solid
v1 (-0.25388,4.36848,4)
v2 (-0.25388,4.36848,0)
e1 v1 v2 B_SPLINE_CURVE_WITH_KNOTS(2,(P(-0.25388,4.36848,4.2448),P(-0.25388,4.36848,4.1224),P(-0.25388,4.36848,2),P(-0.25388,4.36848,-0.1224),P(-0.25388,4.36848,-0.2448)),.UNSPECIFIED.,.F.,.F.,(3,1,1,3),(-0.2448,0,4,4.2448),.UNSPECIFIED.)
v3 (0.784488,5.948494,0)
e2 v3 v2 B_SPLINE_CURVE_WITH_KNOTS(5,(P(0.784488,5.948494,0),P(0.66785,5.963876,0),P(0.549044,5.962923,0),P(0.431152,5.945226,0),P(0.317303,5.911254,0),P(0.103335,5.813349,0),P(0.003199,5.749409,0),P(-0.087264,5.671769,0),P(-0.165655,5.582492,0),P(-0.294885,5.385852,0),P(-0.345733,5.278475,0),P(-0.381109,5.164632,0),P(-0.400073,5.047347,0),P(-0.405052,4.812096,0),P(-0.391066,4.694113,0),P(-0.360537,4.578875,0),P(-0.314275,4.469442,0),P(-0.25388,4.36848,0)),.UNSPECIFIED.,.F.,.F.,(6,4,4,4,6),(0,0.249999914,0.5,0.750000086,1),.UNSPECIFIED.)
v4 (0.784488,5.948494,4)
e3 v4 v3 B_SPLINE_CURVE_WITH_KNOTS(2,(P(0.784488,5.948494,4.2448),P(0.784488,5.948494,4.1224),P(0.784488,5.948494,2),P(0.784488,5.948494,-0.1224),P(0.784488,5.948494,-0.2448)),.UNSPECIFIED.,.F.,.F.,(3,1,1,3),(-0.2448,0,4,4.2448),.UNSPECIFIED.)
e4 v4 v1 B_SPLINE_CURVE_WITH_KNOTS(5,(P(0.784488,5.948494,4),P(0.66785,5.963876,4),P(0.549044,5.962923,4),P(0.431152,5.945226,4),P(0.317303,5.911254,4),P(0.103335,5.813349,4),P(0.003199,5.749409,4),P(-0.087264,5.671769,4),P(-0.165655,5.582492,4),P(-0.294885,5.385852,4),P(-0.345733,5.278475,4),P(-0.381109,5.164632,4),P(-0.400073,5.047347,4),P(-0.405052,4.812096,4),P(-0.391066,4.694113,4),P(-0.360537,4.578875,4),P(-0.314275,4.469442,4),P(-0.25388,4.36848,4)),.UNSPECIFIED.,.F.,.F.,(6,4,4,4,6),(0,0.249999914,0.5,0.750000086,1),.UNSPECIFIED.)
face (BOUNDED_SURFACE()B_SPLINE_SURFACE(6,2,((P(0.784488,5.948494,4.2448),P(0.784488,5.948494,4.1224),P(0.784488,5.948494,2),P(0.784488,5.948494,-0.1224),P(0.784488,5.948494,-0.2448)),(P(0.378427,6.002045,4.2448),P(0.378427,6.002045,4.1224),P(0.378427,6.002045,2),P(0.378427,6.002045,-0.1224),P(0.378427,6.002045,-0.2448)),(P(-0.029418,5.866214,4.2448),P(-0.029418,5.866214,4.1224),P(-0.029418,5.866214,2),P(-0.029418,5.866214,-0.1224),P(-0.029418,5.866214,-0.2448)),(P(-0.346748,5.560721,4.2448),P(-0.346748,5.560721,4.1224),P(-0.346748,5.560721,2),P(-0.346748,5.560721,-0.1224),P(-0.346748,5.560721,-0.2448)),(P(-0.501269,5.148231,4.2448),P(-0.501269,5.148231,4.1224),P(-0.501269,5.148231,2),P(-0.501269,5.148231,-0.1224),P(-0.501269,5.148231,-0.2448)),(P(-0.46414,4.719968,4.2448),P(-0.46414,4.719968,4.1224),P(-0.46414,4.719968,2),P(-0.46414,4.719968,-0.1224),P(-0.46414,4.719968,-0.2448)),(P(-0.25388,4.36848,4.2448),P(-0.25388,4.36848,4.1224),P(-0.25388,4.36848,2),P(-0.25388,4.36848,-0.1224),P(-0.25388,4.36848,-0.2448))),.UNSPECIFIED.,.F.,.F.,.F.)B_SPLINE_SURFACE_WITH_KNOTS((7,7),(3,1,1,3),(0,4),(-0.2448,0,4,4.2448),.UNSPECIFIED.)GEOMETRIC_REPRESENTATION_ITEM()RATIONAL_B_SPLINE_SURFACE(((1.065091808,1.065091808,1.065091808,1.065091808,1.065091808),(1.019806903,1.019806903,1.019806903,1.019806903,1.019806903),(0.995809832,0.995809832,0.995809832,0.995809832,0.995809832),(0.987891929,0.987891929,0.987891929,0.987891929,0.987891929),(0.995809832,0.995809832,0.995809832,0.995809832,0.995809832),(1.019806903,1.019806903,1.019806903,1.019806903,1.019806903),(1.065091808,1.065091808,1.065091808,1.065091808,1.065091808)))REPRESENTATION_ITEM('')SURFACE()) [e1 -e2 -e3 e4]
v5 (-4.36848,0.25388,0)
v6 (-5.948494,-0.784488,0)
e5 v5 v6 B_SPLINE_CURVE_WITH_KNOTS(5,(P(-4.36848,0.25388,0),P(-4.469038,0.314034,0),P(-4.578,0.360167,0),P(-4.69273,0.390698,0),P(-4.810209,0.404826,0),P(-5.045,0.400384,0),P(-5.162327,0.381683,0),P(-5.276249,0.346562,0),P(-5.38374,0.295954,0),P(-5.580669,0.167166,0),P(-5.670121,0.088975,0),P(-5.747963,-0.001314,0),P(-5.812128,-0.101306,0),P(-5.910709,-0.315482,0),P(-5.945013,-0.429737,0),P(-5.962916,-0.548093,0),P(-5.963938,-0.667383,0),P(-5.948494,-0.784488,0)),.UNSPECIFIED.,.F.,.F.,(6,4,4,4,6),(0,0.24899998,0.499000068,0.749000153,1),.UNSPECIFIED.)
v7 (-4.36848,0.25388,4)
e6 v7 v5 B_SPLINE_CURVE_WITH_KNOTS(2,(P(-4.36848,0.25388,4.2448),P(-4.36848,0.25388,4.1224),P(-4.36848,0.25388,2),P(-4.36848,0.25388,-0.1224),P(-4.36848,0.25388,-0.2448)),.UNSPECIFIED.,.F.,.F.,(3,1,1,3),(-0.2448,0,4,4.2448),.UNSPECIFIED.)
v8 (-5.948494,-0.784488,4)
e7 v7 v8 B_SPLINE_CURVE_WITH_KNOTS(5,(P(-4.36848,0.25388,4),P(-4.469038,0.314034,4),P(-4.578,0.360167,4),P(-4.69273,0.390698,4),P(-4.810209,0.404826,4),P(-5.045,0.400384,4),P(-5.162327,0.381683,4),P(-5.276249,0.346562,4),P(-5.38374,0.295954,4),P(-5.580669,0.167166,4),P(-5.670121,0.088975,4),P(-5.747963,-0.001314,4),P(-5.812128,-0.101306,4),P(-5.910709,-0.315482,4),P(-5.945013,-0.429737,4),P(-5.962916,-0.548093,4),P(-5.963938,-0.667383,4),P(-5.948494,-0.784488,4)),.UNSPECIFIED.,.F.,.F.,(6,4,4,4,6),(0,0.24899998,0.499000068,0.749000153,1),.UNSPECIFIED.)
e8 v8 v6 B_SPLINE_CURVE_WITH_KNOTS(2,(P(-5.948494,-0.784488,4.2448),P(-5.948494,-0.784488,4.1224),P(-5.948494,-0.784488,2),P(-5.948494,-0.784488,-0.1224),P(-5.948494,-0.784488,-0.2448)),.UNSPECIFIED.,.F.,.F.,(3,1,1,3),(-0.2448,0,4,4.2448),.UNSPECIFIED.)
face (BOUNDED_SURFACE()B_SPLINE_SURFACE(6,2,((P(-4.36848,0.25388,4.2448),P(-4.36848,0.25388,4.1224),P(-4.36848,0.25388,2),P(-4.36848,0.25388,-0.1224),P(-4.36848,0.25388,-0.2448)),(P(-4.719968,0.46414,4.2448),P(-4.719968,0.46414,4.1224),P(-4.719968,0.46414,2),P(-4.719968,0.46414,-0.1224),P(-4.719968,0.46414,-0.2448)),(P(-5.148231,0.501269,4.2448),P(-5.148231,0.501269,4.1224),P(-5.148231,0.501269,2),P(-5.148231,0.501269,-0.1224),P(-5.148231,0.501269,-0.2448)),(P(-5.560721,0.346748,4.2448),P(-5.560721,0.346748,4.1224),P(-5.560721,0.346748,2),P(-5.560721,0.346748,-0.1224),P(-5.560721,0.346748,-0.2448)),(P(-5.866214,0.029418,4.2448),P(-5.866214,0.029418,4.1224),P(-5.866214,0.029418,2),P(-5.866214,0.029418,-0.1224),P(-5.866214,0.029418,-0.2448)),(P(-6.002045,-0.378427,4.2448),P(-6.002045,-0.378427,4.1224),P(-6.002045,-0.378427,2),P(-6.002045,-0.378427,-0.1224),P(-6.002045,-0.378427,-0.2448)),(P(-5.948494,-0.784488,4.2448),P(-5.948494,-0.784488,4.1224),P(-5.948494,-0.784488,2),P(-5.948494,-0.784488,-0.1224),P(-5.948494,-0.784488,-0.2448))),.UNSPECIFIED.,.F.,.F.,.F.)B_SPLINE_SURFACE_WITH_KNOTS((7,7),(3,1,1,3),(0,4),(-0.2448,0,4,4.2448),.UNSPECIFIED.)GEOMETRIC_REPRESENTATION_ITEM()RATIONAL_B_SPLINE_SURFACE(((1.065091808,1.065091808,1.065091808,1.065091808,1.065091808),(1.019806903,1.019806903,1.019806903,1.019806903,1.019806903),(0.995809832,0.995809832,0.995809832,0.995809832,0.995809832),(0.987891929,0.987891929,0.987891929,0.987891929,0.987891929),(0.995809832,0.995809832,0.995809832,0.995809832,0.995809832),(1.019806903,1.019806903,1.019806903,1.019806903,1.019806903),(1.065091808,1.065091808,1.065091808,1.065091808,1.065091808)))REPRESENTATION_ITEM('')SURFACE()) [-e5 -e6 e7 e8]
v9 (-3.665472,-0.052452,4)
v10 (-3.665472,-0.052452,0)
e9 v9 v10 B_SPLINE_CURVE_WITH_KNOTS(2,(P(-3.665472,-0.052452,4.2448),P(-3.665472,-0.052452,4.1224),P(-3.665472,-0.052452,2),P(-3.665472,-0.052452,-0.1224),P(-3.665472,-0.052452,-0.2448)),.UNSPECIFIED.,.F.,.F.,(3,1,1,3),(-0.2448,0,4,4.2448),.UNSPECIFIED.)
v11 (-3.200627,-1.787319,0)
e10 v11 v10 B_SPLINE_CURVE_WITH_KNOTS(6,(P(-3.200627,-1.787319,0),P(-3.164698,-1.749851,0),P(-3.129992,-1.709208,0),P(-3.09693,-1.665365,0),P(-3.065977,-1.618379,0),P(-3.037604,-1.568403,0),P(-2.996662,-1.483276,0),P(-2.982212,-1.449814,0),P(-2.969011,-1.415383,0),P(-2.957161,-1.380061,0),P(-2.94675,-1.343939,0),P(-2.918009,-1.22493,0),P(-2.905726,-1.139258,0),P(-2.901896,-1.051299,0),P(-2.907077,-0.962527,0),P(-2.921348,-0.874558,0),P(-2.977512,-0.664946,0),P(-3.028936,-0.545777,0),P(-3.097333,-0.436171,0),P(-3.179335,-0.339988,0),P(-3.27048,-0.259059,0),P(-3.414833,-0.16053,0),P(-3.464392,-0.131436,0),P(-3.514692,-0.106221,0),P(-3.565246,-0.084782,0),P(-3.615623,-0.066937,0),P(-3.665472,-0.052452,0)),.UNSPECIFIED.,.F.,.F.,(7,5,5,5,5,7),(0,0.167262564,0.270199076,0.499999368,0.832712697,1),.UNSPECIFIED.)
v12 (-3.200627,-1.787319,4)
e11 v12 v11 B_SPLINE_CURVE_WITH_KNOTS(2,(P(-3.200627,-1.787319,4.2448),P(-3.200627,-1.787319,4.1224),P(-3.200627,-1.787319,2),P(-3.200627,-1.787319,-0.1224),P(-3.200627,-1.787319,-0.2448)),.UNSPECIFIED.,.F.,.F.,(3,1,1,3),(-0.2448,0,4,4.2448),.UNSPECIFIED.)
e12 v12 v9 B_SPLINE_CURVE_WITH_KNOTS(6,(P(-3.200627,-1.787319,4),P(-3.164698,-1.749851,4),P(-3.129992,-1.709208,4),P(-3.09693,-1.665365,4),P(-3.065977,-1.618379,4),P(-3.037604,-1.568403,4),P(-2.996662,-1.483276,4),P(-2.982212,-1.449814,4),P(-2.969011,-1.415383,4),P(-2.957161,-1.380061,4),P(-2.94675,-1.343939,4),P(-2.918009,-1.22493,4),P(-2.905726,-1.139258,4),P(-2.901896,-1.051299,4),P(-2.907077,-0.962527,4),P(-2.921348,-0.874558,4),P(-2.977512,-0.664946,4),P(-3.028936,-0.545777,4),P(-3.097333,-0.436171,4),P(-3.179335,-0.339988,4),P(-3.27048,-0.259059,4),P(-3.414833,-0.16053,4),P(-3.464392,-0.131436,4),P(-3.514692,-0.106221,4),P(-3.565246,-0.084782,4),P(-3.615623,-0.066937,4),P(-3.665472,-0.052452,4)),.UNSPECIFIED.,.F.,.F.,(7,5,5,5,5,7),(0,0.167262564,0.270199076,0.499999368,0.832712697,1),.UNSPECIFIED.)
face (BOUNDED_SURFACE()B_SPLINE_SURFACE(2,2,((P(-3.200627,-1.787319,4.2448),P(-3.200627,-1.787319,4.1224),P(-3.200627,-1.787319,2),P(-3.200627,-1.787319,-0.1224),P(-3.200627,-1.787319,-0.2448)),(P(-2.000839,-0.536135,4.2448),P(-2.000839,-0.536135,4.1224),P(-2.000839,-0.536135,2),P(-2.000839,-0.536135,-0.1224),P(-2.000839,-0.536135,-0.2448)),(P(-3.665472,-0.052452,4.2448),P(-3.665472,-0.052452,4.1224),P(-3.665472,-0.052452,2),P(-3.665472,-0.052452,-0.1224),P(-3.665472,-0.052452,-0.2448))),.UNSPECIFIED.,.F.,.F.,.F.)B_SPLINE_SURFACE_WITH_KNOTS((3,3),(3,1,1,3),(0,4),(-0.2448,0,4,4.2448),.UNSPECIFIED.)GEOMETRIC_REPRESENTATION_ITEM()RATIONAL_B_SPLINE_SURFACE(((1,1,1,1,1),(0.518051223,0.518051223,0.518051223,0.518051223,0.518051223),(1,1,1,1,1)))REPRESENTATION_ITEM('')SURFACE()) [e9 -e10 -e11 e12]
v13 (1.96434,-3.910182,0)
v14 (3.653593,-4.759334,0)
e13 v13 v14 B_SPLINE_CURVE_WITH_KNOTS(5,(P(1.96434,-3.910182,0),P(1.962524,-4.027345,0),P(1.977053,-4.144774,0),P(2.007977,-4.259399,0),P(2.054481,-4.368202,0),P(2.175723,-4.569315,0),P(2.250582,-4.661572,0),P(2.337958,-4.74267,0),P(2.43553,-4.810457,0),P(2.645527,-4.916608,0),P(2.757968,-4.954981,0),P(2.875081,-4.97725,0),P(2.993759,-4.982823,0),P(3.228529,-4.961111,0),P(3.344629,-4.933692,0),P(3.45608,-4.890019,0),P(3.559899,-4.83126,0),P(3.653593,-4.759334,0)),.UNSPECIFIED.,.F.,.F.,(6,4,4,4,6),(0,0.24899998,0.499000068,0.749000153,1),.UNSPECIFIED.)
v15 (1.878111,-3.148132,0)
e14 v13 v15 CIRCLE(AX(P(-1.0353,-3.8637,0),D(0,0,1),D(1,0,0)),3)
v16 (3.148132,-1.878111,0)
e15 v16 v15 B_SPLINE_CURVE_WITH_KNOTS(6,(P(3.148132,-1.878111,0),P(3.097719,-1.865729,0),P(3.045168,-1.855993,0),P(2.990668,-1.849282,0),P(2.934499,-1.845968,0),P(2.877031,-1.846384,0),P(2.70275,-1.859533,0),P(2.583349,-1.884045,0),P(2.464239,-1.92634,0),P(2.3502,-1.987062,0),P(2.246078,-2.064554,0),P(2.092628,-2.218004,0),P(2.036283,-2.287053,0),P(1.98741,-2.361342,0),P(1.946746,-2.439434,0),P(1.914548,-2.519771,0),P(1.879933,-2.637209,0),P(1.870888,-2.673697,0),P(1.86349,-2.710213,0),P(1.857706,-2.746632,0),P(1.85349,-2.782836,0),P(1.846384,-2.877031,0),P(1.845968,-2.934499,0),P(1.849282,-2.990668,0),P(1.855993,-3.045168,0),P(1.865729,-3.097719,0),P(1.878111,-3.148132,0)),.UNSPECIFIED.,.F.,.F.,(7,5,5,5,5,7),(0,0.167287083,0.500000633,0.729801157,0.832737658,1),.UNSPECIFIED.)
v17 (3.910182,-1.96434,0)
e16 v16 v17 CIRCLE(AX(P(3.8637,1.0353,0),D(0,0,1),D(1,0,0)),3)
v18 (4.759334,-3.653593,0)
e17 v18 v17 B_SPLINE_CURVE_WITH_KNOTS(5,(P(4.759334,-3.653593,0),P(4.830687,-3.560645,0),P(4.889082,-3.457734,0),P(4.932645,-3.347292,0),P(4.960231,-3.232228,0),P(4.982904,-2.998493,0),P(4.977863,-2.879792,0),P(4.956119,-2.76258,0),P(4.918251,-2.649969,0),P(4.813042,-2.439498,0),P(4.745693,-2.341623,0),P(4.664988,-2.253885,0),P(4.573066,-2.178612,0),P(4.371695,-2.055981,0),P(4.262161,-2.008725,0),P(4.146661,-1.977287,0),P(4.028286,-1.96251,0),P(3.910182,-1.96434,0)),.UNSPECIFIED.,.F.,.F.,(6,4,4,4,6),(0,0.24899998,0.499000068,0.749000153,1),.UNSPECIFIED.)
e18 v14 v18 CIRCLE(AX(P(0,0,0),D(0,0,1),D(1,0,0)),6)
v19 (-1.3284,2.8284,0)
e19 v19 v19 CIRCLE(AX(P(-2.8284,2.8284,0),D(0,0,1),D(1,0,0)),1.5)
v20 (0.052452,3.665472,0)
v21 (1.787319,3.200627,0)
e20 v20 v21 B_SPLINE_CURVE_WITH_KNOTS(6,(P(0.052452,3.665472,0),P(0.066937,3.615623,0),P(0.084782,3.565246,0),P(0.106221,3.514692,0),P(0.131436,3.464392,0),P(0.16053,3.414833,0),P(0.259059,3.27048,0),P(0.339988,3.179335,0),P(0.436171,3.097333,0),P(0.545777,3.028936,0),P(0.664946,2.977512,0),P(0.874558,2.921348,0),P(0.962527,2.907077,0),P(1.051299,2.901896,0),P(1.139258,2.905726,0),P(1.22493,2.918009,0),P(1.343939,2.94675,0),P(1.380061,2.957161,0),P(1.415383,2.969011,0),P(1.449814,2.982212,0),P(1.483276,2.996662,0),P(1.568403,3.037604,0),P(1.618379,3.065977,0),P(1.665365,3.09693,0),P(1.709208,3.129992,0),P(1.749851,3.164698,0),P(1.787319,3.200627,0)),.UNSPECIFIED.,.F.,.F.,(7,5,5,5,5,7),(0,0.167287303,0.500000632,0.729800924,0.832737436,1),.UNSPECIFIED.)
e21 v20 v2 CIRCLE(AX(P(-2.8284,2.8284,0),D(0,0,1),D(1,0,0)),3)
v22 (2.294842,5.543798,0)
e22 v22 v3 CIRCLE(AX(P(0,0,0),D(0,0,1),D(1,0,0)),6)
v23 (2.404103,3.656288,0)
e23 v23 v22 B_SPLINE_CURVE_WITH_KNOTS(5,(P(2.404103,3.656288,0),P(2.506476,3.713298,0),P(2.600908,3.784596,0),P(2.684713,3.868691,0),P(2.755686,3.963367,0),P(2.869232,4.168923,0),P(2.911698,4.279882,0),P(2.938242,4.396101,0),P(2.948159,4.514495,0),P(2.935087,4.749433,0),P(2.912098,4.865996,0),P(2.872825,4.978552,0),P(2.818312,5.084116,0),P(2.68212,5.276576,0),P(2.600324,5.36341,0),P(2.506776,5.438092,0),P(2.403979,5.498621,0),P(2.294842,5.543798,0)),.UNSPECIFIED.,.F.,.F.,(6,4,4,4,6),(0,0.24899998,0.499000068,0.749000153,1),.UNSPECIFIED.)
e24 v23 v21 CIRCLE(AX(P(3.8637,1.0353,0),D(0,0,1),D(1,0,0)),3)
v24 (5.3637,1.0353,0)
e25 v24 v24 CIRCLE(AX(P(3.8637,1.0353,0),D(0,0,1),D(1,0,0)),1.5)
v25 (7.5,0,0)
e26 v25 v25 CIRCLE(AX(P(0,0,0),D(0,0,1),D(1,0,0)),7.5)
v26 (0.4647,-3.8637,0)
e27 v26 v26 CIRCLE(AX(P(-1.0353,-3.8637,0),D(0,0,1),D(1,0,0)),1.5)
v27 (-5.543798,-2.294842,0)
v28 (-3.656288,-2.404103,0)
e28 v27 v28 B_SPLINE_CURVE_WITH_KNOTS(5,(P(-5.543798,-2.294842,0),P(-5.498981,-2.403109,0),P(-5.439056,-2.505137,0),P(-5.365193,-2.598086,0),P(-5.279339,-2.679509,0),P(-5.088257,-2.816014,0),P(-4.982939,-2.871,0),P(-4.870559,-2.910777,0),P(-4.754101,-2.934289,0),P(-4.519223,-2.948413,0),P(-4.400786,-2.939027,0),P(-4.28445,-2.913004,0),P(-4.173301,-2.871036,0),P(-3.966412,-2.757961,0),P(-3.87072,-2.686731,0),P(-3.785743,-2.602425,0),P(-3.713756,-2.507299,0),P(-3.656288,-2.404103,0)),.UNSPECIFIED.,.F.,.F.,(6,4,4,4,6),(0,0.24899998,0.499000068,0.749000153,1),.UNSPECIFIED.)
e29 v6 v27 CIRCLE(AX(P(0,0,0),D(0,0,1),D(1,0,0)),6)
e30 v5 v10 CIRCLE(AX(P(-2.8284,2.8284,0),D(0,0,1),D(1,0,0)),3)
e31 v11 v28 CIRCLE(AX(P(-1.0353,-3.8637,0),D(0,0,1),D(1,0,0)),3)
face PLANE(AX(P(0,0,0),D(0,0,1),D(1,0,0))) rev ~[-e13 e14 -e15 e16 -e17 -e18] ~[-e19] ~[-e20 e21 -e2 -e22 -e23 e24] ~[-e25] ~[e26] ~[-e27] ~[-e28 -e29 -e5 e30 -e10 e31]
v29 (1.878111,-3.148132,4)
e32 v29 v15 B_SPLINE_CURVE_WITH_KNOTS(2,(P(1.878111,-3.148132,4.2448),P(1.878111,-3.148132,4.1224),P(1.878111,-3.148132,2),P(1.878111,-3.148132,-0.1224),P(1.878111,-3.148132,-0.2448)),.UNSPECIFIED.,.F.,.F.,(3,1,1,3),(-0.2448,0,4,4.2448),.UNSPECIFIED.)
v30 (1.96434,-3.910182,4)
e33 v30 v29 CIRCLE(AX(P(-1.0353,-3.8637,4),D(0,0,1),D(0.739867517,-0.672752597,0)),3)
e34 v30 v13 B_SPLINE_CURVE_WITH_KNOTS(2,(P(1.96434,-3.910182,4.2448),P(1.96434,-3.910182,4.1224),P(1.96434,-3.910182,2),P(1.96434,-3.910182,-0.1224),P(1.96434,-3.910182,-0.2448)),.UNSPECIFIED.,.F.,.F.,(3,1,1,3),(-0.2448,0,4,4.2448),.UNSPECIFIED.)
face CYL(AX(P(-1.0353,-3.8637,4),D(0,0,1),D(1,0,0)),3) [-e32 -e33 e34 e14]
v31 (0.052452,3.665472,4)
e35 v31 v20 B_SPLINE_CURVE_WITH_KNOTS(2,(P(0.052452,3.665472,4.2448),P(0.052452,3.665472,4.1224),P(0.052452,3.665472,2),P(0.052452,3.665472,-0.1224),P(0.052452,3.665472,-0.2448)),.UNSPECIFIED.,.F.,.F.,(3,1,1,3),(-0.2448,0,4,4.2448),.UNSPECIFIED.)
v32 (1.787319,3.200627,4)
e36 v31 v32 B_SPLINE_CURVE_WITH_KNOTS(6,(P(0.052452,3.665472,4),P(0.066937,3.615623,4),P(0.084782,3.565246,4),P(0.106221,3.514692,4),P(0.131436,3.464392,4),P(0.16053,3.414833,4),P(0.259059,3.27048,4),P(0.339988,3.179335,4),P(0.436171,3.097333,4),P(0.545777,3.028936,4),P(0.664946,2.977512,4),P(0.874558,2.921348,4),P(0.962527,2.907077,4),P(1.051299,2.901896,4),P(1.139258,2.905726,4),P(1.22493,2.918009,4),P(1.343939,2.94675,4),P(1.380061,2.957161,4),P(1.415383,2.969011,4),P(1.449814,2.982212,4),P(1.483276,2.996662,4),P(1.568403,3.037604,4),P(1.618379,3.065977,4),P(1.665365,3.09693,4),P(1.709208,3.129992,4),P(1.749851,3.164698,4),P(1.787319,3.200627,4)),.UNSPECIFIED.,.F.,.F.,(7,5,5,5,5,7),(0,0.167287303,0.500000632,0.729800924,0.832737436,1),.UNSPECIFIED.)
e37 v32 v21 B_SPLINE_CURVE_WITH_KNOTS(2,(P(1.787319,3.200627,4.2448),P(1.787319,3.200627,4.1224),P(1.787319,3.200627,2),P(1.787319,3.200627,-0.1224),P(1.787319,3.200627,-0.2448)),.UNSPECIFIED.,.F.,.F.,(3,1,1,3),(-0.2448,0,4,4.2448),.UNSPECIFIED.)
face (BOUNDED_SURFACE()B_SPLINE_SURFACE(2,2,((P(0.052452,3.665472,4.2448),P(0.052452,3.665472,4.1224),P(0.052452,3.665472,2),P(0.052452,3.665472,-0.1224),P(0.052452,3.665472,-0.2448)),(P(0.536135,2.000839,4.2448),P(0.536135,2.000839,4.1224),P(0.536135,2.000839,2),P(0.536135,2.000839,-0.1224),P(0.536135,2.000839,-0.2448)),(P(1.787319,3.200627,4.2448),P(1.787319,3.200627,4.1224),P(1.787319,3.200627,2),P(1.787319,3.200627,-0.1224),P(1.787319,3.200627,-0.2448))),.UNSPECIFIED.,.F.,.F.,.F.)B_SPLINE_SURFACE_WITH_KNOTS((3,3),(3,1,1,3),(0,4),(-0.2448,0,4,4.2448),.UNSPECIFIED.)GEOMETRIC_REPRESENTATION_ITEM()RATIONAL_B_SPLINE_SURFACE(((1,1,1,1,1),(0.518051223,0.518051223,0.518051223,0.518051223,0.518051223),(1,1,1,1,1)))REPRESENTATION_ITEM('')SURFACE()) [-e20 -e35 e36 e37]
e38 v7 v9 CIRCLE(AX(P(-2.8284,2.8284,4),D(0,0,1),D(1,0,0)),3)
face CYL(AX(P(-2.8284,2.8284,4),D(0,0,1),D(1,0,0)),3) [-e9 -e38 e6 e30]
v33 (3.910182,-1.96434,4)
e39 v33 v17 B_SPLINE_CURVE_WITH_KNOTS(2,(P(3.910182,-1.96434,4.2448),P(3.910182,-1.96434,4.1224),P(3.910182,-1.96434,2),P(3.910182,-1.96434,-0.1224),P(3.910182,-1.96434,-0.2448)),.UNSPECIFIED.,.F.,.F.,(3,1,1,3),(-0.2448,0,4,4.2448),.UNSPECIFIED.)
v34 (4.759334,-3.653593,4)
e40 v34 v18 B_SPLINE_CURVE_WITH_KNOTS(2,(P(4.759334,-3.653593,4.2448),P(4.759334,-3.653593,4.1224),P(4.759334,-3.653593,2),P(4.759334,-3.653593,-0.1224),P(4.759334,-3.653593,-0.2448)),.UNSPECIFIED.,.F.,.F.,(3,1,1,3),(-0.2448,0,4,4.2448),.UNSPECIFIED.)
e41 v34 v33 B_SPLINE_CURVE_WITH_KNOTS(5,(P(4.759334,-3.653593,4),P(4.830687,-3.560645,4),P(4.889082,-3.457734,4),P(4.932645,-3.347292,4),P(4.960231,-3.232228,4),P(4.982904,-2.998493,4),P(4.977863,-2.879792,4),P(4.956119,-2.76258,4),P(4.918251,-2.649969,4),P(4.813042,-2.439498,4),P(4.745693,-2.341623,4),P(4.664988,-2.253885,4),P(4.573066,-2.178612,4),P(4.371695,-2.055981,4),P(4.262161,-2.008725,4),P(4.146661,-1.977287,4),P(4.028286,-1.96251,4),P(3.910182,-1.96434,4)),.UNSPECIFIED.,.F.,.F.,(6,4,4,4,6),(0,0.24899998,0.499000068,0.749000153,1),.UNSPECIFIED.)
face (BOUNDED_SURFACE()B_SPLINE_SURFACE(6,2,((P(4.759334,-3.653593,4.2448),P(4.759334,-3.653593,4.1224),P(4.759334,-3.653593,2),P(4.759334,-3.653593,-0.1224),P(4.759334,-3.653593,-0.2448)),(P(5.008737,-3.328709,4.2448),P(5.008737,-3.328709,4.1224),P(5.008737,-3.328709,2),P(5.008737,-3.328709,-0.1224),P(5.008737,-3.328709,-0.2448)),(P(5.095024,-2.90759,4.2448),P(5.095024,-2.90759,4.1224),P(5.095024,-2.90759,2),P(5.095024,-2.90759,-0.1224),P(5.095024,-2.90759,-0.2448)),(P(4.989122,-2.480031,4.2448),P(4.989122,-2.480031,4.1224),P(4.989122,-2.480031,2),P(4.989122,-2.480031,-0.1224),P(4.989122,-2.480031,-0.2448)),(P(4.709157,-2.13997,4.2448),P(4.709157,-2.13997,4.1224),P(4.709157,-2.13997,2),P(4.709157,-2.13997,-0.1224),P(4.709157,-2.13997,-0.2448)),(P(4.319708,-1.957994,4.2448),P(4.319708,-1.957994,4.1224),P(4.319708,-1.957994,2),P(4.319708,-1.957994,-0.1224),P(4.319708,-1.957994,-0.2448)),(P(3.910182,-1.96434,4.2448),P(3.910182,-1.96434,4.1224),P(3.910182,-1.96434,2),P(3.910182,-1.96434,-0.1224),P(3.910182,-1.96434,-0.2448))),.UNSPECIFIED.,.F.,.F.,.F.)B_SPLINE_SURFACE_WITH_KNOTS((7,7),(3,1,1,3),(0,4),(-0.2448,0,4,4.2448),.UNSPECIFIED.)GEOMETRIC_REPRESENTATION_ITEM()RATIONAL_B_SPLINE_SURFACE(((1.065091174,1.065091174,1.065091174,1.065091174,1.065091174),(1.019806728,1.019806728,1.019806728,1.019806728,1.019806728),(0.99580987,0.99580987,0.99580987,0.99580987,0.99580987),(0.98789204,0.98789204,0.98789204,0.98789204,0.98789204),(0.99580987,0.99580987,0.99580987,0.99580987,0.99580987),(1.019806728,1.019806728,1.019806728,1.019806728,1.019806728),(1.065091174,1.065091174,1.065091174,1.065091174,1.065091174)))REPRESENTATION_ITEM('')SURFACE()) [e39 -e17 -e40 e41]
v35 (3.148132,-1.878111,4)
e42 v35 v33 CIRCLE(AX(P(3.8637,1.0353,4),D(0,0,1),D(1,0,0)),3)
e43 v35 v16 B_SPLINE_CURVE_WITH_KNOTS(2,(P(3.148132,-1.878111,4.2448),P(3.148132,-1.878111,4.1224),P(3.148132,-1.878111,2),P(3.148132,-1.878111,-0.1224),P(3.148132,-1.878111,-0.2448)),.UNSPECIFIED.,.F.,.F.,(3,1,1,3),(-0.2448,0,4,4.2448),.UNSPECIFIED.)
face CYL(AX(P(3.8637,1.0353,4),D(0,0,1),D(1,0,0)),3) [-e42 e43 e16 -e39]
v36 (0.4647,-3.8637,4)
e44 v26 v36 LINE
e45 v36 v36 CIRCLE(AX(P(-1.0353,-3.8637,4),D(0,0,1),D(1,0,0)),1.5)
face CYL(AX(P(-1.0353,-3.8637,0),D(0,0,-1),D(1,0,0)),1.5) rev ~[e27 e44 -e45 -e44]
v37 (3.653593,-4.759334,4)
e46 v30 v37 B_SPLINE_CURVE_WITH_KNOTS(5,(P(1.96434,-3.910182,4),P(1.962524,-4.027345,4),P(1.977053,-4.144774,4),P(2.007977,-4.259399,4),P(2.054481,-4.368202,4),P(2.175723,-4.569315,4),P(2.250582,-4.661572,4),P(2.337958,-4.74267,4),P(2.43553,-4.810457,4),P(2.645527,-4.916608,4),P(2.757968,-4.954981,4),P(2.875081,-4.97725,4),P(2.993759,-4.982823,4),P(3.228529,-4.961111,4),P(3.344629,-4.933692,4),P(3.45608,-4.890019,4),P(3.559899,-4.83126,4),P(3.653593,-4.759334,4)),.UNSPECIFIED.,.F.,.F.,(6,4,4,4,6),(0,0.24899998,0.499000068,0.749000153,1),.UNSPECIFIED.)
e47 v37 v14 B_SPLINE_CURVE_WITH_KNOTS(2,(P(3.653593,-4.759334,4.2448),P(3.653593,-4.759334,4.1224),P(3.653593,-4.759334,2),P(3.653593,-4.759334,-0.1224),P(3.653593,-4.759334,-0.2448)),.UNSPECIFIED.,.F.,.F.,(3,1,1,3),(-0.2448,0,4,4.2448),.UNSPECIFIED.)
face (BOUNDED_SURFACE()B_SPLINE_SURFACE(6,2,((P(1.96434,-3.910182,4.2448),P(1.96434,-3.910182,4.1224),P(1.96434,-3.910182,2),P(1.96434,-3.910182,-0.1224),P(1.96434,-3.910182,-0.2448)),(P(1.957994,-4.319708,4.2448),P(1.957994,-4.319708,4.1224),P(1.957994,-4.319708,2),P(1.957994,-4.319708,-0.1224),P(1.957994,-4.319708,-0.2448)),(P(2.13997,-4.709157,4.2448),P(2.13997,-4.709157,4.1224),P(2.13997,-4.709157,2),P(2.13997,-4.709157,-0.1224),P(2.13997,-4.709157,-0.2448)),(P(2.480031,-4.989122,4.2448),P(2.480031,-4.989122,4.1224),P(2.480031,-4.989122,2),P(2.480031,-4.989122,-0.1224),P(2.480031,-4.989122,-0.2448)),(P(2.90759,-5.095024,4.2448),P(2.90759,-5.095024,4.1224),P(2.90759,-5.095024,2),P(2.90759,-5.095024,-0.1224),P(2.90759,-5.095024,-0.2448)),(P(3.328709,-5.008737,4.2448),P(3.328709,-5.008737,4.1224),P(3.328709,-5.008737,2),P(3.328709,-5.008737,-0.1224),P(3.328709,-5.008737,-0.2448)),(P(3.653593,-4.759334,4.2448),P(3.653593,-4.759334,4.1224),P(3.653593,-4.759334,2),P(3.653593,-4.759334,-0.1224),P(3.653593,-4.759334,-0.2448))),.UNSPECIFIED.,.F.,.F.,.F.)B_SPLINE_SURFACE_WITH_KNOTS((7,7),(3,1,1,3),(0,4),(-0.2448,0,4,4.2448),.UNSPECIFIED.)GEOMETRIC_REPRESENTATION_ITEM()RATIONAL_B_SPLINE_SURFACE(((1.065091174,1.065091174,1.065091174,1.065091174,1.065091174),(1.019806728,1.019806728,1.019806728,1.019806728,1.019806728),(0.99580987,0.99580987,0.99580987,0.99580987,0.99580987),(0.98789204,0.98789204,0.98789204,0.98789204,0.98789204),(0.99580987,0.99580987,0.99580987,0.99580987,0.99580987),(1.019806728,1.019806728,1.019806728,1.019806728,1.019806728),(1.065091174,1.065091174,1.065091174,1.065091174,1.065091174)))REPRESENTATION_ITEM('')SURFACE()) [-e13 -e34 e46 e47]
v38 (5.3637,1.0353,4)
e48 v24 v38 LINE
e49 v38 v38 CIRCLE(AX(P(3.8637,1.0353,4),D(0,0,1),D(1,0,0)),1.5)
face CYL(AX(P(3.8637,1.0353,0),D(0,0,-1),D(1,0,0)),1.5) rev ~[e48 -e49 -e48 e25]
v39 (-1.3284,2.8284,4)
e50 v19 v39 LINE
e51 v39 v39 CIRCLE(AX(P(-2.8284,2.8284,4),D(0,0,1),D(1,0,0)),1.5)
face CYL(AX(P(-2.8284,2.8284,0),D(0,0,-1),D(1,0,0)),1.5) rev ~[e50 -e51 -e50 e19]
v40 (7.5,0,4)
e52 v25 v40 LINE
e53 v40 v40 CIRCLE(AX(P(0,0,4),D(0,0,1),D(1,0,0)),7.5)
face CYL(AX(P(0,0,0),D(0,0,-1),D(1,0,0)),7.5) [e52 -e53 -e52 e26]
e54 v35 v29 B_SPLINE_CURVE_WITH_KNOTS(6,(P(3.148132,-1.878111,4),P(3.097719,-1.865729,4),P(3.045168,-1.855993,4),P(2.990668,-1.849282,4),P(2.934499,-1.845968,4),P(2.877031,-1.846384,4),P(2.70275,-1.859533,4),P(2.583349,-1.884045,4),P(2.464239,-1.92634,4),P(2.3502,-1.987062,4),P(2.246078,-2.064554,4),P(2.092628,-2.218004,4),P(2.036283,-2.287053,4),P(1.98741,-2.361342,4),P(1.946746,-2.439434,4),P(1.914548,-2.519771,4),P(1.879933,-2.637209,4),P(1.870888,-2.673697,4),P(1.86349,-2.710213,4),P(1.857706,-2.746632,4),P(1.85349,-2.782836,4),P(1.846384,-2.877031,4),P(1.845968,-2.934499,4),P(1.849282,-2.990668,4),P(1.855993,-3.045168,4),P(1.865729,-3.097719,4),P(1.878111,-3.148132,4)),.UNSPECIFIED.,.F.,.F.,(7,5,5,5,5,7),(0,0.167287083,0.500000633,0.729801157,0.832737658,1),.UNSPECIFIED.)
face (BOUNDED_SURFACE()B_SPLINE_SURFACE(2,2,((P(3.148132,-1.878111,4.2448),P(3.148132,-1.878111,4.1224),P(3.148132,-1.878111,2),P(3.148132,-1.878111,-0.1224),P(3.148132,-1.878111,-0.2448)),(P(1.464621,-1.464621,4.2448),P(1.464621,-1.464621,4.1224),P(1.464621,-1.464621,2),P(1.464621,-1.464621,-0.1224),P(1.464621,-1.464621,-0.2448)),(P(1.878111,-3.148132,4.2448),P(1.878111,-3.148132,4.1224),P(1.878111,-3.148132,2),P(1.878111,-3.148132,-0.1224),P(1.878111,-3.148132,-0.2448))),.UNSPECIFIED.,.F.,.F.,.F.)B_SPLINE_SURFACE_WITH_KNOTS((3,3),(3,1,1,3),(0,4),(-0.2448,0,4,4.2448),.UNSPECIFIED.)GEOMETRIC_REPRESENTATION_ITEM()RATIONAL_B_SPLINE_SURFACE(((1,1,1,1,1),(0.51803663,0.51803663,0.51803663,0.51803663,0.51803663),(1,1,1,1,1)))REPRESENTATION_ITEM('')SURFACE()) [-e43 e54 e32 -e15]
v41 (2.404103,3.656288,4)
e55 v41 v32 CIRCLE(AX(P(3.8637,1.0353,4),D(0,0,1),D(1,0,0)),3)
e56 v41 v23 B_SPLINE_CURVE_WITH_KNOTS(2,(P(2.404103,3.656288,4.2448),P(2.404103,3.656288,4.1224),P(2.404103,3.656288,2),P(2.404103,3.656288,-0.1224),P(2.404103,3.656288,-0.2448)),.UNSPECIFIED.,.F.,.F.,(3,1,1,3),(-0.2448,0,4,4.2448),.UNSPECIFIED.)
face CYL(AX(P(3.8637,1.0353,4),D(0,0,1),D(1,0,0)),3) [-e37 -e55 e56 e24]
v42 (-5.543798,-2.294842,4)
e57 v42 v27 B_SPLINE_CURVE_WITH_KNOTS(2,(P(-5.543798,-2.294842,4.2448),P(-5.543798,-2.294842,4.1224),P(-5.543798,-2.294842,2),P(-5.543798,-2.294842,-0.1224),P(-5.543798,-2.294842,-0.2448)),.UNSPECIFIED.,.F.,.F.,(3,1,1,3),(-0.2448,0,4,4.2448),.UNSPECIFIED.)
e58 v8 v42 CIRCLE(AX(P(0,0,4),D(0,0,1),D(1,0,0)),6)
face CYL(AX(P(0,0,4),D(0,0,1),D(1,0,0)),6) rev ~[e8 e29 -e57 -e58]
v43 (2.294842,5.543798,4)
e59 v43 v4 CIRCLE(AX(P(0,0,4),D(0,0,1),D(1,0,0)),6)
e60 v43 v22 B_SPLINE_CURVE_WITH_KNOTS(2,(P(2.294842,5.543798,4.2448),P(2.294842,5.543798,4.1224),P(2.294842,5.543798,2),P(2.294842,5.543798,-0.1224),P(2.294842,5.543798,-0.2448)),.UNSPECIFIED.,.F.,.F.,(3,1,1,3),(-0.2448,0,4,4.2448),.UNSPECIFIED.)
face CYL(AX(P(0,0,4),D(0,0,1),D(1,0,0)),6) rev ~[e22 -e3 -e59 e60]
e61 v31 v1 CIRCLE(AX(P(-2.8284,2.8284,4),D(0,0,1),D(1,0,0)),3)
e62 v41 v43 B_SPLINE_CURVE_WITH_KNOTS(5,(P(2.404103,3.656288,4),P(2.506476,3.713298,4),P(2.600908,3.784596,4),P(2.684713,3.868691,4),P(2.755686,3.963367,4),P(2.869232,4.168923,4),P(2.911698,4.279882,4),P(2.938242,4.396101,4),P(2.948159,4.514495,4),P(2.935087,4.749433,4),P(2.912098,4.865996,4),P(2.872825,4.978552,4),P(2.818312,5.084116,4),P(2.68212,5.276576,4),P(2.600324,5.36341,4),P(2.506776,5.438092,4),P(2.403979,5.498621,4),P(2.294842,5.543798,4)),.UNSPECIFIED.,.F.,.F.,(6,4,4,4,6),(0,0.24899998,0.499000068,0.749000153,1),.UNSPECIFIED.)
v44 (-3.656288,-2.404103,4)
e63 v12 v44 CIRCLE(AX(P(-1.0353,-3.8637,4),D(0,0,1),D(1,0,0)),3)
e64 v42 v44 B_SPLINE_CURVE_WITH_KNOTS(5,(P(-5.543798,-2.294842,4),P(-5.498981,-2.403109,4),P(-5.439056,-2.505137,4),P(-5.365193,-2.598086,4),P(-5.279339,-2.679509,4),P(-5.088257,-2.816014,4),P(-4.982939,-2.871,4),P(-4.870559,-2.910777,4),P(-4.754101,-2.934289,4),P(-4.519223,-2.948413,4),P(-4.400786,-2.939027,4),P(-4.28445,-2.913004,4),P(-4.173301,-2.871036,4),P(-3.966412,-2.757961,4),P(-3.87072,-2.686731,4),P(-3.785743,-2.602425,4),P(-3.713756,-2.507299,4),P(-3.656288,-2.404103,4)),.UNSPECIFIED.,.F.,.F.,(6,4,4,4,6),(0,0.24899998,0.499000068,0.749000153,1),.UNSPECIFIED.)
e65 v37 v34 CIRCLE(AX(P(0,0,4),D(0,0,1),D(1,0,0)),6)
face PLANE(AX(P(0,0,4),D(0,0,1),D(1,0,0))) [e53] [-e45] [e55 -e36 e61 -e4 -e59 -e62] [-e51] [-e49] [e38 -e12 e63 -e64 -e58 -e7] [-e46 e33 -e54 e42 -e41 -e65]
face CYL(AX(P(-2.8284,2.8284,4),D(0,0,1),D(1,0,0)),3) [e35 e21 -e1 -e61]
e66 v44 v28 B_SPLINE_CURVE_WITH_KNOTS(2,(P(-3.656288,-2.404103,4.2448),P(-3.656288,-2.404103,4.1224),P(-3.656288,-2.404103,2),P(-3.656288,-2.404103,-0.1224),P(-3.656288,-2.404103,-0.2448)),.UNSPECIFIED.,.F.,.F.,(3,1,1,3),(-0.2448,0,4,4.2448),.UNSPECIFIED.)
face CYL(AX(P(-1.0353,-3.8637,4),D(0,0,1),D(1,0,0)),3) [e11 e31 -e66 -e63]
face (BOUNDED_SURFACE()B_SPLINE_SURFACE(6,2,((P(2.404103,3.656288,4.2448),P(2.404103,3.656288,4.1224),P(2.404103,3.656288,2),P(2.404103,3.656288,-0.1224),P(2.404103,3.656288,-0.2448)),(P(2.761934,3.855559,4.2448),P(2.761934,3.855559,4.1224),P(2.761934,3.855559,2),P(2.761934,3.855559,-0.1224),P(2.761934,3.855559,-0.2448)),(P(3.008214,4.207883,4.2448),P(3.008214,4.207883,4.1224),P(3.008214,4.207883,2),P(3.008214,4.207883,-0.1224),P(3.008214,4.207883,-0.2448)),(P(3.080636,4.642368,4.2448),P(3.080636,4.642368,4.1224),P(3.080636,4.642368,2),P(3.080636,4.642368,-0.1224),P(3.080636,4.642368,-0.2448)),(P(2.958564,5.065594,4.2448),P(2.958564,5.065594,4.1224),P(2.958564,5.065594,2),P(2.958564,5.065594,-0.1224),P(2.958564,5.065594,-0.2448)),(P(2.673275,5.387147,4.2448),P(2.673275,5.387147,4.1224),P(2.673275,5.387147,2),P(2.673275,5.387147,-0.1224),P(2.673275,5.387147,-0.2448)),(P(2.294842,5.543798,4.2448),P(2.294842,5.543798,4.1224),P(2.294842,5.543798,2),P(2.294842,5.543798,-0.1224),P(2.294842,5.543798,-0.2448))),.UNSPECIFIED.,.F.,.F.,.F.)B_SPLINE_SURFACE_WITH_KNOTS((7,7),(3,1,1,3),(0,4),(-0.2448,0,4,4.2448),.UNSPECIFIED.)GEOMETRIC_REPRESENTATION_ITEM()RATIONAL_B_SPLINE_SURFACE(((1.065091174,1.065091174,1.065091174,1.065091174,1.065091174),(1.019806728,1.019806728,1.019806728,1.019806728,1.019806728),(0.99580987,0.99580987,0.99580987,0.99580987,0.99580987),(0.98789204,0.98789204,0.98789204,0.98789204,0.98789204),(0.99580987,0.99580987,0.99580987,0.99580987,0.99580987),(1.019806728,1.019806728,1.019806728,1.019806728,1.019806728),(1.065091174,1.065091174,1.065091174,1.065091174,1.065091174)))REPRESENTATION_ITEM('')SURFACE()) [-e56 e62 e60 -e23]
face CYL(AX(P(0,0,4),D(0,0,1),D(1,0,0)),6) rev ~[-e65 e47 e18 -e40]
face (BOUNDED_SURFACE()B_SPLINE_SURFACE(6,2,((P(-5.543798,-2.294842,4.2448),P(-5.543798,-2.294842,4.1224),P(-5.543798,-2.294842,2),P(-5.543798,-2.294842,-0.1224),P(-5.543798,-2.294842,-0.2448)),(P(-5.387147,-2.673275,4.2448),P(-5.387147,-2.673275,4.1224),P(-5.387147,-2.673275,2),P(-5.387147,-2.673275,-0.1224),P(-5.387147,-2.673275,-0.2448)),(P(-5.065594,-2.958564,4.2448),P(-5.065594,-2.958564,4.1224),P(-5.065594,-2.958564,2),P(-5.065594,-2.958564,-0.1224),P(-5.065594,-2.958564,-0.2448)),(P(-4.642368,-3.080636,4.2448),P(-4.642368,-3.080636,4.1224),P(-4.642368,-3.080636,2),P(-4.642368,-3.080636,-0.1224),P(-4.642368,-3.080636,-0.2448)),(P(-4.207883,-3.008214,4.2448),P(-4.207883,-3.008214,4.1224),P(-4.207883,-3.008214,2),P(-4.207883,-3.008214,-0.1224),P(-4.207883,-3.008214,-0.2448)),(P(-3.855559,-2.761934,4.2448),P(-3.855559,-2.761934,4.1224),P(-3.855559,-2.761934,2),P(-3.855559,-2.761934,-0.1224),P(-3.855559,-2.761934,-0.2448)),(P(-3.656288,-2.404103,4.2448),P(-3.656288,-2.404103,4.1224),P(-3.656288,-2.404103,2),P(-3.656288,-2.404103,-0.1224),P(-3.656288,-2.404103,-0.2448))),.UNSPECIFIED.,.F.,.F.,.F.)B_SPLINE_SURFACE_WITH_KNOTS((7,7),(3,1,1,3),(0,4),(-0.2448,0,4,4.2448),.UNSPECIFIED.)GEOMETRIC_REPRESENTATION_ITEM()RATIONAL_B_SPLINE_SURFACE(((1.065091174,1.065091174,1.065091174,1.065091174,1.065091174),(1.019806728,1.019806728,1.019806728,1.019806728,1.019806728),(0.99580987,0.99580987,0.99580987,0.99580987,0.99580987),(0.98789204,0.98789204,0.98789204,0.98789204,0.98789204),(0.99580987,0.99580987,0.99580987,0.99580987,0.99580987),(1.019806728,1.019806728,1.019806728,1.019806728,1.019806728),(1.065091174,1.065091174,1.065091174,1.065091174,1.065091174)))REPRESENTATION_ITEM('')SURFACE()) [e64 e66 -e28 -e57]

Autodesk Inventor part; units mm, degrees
ref_plane "YZ Plane" through (0, 0, 0) normal (1, 0, 0) x (0, 1, 0)
ref_plane "XZ Plane" through (0, 0, 0) normal (0, 1, 0) x (-1, 0, 0)
ref_plane "XY Plane" through (0, 0, 0) normal (0, 0, 1) x (1, 0, 0)
sketch "スケッチ1" plane through (0, 0, 0) normal (0, 0, 1) x (1, 0, 0)
  circle A0 centre (0, 0) radius 6.975
  circle A1 centre (-2.8284, 2.8284) radius 1.5
  circle A2 centre (-1.0353, -3.8637) radius 1.5
  circle A3 centre (3.8637, 1.0353) radius 1.5
  circle A4 centre (0, 0) radius 7.5
  dimension "d0" = 13.95
  dimension "d1" = 3
  dimension "d2" = 4
  dimension "d5" = 360
  dimension "d9" = 15
extrude "押し出し2" add sketch "スケッチ1" along normal blind 4 contours A0 | A4
sketch "スケッチ2" plane through (0, 0, 4) normal (0, 0, 1) x (1, 0, 0)
  circle A0 centre (0, 0) radius 7.5 projected
  circle A1 centre (-1.0353, -3.8637) radius 1.5 projected
  circle A2 centre (-2.8284, 2.8284) radius 1.5 projected
  circle A3 centre (3.8637, 1.0353) radius 1.5 projected
  circle A4 centre (0, 0) radius 3
  circle A5 centre (0, 0) radius 6
  circle A6 centre (-2.8284, 2.8284) radius 3
  circle A7 centre (-1.0353, -3.8637) radius 3
  circle A8 centre (3.8637, 1.0353) radius 3
  point P0 (5.882, -1.1843)
  point P1 (2.5106, -1.6422)
  point P2 (1.6422, -2.5106)
  point P3 (1.1843, -5.882)
  point P4 (1.3531, 2.6775)
  point P5 (4.5018, 3.9666)
  point P6 (-1.9153, 5.6861)
  point P7 (0.1669, 2.9954)
  point P8 (-3.9666, -4.5018)
  point P9 (-2.6775, -1.3531)
  point P10 (-2.9954, -0.1669)
  point P11 (-5.6861, 1.9153)
  dimension "d13" = 6
  dimension "d14" = 1.5
  dimension "d15" = 1.5
  dimension "d16" = 1.5
  dimension "d17" = 1.5
extrude "押し出し3" cut sketch "スケッチ2" against normal blind 10 contours A4 A8 A5 A7 | A7 A5 A6 A4 | A4 A6 A5 A8
fillet "フィレット1" radius 1.05 12 edges at (-1.9153, 5.6861, 2) (4.5018, 3.9666, 2) (0.1669, 2.9954, 2) (1.3531, 2.6775, 2) (-5.6861, 1.9153, 2) (-2.9954, -0.1669, 2) (-2.6775, -1.3531, 2) (-3.9666, -4.5018, 2) (2.5106, -1.6422, 2) (1.6422, -2.5106, 2) (5.882, -1.1843, 2) (1.1843, -5.882, 2)
properties part number "アームカムD15t4" material "アセタール樹脂、白"
